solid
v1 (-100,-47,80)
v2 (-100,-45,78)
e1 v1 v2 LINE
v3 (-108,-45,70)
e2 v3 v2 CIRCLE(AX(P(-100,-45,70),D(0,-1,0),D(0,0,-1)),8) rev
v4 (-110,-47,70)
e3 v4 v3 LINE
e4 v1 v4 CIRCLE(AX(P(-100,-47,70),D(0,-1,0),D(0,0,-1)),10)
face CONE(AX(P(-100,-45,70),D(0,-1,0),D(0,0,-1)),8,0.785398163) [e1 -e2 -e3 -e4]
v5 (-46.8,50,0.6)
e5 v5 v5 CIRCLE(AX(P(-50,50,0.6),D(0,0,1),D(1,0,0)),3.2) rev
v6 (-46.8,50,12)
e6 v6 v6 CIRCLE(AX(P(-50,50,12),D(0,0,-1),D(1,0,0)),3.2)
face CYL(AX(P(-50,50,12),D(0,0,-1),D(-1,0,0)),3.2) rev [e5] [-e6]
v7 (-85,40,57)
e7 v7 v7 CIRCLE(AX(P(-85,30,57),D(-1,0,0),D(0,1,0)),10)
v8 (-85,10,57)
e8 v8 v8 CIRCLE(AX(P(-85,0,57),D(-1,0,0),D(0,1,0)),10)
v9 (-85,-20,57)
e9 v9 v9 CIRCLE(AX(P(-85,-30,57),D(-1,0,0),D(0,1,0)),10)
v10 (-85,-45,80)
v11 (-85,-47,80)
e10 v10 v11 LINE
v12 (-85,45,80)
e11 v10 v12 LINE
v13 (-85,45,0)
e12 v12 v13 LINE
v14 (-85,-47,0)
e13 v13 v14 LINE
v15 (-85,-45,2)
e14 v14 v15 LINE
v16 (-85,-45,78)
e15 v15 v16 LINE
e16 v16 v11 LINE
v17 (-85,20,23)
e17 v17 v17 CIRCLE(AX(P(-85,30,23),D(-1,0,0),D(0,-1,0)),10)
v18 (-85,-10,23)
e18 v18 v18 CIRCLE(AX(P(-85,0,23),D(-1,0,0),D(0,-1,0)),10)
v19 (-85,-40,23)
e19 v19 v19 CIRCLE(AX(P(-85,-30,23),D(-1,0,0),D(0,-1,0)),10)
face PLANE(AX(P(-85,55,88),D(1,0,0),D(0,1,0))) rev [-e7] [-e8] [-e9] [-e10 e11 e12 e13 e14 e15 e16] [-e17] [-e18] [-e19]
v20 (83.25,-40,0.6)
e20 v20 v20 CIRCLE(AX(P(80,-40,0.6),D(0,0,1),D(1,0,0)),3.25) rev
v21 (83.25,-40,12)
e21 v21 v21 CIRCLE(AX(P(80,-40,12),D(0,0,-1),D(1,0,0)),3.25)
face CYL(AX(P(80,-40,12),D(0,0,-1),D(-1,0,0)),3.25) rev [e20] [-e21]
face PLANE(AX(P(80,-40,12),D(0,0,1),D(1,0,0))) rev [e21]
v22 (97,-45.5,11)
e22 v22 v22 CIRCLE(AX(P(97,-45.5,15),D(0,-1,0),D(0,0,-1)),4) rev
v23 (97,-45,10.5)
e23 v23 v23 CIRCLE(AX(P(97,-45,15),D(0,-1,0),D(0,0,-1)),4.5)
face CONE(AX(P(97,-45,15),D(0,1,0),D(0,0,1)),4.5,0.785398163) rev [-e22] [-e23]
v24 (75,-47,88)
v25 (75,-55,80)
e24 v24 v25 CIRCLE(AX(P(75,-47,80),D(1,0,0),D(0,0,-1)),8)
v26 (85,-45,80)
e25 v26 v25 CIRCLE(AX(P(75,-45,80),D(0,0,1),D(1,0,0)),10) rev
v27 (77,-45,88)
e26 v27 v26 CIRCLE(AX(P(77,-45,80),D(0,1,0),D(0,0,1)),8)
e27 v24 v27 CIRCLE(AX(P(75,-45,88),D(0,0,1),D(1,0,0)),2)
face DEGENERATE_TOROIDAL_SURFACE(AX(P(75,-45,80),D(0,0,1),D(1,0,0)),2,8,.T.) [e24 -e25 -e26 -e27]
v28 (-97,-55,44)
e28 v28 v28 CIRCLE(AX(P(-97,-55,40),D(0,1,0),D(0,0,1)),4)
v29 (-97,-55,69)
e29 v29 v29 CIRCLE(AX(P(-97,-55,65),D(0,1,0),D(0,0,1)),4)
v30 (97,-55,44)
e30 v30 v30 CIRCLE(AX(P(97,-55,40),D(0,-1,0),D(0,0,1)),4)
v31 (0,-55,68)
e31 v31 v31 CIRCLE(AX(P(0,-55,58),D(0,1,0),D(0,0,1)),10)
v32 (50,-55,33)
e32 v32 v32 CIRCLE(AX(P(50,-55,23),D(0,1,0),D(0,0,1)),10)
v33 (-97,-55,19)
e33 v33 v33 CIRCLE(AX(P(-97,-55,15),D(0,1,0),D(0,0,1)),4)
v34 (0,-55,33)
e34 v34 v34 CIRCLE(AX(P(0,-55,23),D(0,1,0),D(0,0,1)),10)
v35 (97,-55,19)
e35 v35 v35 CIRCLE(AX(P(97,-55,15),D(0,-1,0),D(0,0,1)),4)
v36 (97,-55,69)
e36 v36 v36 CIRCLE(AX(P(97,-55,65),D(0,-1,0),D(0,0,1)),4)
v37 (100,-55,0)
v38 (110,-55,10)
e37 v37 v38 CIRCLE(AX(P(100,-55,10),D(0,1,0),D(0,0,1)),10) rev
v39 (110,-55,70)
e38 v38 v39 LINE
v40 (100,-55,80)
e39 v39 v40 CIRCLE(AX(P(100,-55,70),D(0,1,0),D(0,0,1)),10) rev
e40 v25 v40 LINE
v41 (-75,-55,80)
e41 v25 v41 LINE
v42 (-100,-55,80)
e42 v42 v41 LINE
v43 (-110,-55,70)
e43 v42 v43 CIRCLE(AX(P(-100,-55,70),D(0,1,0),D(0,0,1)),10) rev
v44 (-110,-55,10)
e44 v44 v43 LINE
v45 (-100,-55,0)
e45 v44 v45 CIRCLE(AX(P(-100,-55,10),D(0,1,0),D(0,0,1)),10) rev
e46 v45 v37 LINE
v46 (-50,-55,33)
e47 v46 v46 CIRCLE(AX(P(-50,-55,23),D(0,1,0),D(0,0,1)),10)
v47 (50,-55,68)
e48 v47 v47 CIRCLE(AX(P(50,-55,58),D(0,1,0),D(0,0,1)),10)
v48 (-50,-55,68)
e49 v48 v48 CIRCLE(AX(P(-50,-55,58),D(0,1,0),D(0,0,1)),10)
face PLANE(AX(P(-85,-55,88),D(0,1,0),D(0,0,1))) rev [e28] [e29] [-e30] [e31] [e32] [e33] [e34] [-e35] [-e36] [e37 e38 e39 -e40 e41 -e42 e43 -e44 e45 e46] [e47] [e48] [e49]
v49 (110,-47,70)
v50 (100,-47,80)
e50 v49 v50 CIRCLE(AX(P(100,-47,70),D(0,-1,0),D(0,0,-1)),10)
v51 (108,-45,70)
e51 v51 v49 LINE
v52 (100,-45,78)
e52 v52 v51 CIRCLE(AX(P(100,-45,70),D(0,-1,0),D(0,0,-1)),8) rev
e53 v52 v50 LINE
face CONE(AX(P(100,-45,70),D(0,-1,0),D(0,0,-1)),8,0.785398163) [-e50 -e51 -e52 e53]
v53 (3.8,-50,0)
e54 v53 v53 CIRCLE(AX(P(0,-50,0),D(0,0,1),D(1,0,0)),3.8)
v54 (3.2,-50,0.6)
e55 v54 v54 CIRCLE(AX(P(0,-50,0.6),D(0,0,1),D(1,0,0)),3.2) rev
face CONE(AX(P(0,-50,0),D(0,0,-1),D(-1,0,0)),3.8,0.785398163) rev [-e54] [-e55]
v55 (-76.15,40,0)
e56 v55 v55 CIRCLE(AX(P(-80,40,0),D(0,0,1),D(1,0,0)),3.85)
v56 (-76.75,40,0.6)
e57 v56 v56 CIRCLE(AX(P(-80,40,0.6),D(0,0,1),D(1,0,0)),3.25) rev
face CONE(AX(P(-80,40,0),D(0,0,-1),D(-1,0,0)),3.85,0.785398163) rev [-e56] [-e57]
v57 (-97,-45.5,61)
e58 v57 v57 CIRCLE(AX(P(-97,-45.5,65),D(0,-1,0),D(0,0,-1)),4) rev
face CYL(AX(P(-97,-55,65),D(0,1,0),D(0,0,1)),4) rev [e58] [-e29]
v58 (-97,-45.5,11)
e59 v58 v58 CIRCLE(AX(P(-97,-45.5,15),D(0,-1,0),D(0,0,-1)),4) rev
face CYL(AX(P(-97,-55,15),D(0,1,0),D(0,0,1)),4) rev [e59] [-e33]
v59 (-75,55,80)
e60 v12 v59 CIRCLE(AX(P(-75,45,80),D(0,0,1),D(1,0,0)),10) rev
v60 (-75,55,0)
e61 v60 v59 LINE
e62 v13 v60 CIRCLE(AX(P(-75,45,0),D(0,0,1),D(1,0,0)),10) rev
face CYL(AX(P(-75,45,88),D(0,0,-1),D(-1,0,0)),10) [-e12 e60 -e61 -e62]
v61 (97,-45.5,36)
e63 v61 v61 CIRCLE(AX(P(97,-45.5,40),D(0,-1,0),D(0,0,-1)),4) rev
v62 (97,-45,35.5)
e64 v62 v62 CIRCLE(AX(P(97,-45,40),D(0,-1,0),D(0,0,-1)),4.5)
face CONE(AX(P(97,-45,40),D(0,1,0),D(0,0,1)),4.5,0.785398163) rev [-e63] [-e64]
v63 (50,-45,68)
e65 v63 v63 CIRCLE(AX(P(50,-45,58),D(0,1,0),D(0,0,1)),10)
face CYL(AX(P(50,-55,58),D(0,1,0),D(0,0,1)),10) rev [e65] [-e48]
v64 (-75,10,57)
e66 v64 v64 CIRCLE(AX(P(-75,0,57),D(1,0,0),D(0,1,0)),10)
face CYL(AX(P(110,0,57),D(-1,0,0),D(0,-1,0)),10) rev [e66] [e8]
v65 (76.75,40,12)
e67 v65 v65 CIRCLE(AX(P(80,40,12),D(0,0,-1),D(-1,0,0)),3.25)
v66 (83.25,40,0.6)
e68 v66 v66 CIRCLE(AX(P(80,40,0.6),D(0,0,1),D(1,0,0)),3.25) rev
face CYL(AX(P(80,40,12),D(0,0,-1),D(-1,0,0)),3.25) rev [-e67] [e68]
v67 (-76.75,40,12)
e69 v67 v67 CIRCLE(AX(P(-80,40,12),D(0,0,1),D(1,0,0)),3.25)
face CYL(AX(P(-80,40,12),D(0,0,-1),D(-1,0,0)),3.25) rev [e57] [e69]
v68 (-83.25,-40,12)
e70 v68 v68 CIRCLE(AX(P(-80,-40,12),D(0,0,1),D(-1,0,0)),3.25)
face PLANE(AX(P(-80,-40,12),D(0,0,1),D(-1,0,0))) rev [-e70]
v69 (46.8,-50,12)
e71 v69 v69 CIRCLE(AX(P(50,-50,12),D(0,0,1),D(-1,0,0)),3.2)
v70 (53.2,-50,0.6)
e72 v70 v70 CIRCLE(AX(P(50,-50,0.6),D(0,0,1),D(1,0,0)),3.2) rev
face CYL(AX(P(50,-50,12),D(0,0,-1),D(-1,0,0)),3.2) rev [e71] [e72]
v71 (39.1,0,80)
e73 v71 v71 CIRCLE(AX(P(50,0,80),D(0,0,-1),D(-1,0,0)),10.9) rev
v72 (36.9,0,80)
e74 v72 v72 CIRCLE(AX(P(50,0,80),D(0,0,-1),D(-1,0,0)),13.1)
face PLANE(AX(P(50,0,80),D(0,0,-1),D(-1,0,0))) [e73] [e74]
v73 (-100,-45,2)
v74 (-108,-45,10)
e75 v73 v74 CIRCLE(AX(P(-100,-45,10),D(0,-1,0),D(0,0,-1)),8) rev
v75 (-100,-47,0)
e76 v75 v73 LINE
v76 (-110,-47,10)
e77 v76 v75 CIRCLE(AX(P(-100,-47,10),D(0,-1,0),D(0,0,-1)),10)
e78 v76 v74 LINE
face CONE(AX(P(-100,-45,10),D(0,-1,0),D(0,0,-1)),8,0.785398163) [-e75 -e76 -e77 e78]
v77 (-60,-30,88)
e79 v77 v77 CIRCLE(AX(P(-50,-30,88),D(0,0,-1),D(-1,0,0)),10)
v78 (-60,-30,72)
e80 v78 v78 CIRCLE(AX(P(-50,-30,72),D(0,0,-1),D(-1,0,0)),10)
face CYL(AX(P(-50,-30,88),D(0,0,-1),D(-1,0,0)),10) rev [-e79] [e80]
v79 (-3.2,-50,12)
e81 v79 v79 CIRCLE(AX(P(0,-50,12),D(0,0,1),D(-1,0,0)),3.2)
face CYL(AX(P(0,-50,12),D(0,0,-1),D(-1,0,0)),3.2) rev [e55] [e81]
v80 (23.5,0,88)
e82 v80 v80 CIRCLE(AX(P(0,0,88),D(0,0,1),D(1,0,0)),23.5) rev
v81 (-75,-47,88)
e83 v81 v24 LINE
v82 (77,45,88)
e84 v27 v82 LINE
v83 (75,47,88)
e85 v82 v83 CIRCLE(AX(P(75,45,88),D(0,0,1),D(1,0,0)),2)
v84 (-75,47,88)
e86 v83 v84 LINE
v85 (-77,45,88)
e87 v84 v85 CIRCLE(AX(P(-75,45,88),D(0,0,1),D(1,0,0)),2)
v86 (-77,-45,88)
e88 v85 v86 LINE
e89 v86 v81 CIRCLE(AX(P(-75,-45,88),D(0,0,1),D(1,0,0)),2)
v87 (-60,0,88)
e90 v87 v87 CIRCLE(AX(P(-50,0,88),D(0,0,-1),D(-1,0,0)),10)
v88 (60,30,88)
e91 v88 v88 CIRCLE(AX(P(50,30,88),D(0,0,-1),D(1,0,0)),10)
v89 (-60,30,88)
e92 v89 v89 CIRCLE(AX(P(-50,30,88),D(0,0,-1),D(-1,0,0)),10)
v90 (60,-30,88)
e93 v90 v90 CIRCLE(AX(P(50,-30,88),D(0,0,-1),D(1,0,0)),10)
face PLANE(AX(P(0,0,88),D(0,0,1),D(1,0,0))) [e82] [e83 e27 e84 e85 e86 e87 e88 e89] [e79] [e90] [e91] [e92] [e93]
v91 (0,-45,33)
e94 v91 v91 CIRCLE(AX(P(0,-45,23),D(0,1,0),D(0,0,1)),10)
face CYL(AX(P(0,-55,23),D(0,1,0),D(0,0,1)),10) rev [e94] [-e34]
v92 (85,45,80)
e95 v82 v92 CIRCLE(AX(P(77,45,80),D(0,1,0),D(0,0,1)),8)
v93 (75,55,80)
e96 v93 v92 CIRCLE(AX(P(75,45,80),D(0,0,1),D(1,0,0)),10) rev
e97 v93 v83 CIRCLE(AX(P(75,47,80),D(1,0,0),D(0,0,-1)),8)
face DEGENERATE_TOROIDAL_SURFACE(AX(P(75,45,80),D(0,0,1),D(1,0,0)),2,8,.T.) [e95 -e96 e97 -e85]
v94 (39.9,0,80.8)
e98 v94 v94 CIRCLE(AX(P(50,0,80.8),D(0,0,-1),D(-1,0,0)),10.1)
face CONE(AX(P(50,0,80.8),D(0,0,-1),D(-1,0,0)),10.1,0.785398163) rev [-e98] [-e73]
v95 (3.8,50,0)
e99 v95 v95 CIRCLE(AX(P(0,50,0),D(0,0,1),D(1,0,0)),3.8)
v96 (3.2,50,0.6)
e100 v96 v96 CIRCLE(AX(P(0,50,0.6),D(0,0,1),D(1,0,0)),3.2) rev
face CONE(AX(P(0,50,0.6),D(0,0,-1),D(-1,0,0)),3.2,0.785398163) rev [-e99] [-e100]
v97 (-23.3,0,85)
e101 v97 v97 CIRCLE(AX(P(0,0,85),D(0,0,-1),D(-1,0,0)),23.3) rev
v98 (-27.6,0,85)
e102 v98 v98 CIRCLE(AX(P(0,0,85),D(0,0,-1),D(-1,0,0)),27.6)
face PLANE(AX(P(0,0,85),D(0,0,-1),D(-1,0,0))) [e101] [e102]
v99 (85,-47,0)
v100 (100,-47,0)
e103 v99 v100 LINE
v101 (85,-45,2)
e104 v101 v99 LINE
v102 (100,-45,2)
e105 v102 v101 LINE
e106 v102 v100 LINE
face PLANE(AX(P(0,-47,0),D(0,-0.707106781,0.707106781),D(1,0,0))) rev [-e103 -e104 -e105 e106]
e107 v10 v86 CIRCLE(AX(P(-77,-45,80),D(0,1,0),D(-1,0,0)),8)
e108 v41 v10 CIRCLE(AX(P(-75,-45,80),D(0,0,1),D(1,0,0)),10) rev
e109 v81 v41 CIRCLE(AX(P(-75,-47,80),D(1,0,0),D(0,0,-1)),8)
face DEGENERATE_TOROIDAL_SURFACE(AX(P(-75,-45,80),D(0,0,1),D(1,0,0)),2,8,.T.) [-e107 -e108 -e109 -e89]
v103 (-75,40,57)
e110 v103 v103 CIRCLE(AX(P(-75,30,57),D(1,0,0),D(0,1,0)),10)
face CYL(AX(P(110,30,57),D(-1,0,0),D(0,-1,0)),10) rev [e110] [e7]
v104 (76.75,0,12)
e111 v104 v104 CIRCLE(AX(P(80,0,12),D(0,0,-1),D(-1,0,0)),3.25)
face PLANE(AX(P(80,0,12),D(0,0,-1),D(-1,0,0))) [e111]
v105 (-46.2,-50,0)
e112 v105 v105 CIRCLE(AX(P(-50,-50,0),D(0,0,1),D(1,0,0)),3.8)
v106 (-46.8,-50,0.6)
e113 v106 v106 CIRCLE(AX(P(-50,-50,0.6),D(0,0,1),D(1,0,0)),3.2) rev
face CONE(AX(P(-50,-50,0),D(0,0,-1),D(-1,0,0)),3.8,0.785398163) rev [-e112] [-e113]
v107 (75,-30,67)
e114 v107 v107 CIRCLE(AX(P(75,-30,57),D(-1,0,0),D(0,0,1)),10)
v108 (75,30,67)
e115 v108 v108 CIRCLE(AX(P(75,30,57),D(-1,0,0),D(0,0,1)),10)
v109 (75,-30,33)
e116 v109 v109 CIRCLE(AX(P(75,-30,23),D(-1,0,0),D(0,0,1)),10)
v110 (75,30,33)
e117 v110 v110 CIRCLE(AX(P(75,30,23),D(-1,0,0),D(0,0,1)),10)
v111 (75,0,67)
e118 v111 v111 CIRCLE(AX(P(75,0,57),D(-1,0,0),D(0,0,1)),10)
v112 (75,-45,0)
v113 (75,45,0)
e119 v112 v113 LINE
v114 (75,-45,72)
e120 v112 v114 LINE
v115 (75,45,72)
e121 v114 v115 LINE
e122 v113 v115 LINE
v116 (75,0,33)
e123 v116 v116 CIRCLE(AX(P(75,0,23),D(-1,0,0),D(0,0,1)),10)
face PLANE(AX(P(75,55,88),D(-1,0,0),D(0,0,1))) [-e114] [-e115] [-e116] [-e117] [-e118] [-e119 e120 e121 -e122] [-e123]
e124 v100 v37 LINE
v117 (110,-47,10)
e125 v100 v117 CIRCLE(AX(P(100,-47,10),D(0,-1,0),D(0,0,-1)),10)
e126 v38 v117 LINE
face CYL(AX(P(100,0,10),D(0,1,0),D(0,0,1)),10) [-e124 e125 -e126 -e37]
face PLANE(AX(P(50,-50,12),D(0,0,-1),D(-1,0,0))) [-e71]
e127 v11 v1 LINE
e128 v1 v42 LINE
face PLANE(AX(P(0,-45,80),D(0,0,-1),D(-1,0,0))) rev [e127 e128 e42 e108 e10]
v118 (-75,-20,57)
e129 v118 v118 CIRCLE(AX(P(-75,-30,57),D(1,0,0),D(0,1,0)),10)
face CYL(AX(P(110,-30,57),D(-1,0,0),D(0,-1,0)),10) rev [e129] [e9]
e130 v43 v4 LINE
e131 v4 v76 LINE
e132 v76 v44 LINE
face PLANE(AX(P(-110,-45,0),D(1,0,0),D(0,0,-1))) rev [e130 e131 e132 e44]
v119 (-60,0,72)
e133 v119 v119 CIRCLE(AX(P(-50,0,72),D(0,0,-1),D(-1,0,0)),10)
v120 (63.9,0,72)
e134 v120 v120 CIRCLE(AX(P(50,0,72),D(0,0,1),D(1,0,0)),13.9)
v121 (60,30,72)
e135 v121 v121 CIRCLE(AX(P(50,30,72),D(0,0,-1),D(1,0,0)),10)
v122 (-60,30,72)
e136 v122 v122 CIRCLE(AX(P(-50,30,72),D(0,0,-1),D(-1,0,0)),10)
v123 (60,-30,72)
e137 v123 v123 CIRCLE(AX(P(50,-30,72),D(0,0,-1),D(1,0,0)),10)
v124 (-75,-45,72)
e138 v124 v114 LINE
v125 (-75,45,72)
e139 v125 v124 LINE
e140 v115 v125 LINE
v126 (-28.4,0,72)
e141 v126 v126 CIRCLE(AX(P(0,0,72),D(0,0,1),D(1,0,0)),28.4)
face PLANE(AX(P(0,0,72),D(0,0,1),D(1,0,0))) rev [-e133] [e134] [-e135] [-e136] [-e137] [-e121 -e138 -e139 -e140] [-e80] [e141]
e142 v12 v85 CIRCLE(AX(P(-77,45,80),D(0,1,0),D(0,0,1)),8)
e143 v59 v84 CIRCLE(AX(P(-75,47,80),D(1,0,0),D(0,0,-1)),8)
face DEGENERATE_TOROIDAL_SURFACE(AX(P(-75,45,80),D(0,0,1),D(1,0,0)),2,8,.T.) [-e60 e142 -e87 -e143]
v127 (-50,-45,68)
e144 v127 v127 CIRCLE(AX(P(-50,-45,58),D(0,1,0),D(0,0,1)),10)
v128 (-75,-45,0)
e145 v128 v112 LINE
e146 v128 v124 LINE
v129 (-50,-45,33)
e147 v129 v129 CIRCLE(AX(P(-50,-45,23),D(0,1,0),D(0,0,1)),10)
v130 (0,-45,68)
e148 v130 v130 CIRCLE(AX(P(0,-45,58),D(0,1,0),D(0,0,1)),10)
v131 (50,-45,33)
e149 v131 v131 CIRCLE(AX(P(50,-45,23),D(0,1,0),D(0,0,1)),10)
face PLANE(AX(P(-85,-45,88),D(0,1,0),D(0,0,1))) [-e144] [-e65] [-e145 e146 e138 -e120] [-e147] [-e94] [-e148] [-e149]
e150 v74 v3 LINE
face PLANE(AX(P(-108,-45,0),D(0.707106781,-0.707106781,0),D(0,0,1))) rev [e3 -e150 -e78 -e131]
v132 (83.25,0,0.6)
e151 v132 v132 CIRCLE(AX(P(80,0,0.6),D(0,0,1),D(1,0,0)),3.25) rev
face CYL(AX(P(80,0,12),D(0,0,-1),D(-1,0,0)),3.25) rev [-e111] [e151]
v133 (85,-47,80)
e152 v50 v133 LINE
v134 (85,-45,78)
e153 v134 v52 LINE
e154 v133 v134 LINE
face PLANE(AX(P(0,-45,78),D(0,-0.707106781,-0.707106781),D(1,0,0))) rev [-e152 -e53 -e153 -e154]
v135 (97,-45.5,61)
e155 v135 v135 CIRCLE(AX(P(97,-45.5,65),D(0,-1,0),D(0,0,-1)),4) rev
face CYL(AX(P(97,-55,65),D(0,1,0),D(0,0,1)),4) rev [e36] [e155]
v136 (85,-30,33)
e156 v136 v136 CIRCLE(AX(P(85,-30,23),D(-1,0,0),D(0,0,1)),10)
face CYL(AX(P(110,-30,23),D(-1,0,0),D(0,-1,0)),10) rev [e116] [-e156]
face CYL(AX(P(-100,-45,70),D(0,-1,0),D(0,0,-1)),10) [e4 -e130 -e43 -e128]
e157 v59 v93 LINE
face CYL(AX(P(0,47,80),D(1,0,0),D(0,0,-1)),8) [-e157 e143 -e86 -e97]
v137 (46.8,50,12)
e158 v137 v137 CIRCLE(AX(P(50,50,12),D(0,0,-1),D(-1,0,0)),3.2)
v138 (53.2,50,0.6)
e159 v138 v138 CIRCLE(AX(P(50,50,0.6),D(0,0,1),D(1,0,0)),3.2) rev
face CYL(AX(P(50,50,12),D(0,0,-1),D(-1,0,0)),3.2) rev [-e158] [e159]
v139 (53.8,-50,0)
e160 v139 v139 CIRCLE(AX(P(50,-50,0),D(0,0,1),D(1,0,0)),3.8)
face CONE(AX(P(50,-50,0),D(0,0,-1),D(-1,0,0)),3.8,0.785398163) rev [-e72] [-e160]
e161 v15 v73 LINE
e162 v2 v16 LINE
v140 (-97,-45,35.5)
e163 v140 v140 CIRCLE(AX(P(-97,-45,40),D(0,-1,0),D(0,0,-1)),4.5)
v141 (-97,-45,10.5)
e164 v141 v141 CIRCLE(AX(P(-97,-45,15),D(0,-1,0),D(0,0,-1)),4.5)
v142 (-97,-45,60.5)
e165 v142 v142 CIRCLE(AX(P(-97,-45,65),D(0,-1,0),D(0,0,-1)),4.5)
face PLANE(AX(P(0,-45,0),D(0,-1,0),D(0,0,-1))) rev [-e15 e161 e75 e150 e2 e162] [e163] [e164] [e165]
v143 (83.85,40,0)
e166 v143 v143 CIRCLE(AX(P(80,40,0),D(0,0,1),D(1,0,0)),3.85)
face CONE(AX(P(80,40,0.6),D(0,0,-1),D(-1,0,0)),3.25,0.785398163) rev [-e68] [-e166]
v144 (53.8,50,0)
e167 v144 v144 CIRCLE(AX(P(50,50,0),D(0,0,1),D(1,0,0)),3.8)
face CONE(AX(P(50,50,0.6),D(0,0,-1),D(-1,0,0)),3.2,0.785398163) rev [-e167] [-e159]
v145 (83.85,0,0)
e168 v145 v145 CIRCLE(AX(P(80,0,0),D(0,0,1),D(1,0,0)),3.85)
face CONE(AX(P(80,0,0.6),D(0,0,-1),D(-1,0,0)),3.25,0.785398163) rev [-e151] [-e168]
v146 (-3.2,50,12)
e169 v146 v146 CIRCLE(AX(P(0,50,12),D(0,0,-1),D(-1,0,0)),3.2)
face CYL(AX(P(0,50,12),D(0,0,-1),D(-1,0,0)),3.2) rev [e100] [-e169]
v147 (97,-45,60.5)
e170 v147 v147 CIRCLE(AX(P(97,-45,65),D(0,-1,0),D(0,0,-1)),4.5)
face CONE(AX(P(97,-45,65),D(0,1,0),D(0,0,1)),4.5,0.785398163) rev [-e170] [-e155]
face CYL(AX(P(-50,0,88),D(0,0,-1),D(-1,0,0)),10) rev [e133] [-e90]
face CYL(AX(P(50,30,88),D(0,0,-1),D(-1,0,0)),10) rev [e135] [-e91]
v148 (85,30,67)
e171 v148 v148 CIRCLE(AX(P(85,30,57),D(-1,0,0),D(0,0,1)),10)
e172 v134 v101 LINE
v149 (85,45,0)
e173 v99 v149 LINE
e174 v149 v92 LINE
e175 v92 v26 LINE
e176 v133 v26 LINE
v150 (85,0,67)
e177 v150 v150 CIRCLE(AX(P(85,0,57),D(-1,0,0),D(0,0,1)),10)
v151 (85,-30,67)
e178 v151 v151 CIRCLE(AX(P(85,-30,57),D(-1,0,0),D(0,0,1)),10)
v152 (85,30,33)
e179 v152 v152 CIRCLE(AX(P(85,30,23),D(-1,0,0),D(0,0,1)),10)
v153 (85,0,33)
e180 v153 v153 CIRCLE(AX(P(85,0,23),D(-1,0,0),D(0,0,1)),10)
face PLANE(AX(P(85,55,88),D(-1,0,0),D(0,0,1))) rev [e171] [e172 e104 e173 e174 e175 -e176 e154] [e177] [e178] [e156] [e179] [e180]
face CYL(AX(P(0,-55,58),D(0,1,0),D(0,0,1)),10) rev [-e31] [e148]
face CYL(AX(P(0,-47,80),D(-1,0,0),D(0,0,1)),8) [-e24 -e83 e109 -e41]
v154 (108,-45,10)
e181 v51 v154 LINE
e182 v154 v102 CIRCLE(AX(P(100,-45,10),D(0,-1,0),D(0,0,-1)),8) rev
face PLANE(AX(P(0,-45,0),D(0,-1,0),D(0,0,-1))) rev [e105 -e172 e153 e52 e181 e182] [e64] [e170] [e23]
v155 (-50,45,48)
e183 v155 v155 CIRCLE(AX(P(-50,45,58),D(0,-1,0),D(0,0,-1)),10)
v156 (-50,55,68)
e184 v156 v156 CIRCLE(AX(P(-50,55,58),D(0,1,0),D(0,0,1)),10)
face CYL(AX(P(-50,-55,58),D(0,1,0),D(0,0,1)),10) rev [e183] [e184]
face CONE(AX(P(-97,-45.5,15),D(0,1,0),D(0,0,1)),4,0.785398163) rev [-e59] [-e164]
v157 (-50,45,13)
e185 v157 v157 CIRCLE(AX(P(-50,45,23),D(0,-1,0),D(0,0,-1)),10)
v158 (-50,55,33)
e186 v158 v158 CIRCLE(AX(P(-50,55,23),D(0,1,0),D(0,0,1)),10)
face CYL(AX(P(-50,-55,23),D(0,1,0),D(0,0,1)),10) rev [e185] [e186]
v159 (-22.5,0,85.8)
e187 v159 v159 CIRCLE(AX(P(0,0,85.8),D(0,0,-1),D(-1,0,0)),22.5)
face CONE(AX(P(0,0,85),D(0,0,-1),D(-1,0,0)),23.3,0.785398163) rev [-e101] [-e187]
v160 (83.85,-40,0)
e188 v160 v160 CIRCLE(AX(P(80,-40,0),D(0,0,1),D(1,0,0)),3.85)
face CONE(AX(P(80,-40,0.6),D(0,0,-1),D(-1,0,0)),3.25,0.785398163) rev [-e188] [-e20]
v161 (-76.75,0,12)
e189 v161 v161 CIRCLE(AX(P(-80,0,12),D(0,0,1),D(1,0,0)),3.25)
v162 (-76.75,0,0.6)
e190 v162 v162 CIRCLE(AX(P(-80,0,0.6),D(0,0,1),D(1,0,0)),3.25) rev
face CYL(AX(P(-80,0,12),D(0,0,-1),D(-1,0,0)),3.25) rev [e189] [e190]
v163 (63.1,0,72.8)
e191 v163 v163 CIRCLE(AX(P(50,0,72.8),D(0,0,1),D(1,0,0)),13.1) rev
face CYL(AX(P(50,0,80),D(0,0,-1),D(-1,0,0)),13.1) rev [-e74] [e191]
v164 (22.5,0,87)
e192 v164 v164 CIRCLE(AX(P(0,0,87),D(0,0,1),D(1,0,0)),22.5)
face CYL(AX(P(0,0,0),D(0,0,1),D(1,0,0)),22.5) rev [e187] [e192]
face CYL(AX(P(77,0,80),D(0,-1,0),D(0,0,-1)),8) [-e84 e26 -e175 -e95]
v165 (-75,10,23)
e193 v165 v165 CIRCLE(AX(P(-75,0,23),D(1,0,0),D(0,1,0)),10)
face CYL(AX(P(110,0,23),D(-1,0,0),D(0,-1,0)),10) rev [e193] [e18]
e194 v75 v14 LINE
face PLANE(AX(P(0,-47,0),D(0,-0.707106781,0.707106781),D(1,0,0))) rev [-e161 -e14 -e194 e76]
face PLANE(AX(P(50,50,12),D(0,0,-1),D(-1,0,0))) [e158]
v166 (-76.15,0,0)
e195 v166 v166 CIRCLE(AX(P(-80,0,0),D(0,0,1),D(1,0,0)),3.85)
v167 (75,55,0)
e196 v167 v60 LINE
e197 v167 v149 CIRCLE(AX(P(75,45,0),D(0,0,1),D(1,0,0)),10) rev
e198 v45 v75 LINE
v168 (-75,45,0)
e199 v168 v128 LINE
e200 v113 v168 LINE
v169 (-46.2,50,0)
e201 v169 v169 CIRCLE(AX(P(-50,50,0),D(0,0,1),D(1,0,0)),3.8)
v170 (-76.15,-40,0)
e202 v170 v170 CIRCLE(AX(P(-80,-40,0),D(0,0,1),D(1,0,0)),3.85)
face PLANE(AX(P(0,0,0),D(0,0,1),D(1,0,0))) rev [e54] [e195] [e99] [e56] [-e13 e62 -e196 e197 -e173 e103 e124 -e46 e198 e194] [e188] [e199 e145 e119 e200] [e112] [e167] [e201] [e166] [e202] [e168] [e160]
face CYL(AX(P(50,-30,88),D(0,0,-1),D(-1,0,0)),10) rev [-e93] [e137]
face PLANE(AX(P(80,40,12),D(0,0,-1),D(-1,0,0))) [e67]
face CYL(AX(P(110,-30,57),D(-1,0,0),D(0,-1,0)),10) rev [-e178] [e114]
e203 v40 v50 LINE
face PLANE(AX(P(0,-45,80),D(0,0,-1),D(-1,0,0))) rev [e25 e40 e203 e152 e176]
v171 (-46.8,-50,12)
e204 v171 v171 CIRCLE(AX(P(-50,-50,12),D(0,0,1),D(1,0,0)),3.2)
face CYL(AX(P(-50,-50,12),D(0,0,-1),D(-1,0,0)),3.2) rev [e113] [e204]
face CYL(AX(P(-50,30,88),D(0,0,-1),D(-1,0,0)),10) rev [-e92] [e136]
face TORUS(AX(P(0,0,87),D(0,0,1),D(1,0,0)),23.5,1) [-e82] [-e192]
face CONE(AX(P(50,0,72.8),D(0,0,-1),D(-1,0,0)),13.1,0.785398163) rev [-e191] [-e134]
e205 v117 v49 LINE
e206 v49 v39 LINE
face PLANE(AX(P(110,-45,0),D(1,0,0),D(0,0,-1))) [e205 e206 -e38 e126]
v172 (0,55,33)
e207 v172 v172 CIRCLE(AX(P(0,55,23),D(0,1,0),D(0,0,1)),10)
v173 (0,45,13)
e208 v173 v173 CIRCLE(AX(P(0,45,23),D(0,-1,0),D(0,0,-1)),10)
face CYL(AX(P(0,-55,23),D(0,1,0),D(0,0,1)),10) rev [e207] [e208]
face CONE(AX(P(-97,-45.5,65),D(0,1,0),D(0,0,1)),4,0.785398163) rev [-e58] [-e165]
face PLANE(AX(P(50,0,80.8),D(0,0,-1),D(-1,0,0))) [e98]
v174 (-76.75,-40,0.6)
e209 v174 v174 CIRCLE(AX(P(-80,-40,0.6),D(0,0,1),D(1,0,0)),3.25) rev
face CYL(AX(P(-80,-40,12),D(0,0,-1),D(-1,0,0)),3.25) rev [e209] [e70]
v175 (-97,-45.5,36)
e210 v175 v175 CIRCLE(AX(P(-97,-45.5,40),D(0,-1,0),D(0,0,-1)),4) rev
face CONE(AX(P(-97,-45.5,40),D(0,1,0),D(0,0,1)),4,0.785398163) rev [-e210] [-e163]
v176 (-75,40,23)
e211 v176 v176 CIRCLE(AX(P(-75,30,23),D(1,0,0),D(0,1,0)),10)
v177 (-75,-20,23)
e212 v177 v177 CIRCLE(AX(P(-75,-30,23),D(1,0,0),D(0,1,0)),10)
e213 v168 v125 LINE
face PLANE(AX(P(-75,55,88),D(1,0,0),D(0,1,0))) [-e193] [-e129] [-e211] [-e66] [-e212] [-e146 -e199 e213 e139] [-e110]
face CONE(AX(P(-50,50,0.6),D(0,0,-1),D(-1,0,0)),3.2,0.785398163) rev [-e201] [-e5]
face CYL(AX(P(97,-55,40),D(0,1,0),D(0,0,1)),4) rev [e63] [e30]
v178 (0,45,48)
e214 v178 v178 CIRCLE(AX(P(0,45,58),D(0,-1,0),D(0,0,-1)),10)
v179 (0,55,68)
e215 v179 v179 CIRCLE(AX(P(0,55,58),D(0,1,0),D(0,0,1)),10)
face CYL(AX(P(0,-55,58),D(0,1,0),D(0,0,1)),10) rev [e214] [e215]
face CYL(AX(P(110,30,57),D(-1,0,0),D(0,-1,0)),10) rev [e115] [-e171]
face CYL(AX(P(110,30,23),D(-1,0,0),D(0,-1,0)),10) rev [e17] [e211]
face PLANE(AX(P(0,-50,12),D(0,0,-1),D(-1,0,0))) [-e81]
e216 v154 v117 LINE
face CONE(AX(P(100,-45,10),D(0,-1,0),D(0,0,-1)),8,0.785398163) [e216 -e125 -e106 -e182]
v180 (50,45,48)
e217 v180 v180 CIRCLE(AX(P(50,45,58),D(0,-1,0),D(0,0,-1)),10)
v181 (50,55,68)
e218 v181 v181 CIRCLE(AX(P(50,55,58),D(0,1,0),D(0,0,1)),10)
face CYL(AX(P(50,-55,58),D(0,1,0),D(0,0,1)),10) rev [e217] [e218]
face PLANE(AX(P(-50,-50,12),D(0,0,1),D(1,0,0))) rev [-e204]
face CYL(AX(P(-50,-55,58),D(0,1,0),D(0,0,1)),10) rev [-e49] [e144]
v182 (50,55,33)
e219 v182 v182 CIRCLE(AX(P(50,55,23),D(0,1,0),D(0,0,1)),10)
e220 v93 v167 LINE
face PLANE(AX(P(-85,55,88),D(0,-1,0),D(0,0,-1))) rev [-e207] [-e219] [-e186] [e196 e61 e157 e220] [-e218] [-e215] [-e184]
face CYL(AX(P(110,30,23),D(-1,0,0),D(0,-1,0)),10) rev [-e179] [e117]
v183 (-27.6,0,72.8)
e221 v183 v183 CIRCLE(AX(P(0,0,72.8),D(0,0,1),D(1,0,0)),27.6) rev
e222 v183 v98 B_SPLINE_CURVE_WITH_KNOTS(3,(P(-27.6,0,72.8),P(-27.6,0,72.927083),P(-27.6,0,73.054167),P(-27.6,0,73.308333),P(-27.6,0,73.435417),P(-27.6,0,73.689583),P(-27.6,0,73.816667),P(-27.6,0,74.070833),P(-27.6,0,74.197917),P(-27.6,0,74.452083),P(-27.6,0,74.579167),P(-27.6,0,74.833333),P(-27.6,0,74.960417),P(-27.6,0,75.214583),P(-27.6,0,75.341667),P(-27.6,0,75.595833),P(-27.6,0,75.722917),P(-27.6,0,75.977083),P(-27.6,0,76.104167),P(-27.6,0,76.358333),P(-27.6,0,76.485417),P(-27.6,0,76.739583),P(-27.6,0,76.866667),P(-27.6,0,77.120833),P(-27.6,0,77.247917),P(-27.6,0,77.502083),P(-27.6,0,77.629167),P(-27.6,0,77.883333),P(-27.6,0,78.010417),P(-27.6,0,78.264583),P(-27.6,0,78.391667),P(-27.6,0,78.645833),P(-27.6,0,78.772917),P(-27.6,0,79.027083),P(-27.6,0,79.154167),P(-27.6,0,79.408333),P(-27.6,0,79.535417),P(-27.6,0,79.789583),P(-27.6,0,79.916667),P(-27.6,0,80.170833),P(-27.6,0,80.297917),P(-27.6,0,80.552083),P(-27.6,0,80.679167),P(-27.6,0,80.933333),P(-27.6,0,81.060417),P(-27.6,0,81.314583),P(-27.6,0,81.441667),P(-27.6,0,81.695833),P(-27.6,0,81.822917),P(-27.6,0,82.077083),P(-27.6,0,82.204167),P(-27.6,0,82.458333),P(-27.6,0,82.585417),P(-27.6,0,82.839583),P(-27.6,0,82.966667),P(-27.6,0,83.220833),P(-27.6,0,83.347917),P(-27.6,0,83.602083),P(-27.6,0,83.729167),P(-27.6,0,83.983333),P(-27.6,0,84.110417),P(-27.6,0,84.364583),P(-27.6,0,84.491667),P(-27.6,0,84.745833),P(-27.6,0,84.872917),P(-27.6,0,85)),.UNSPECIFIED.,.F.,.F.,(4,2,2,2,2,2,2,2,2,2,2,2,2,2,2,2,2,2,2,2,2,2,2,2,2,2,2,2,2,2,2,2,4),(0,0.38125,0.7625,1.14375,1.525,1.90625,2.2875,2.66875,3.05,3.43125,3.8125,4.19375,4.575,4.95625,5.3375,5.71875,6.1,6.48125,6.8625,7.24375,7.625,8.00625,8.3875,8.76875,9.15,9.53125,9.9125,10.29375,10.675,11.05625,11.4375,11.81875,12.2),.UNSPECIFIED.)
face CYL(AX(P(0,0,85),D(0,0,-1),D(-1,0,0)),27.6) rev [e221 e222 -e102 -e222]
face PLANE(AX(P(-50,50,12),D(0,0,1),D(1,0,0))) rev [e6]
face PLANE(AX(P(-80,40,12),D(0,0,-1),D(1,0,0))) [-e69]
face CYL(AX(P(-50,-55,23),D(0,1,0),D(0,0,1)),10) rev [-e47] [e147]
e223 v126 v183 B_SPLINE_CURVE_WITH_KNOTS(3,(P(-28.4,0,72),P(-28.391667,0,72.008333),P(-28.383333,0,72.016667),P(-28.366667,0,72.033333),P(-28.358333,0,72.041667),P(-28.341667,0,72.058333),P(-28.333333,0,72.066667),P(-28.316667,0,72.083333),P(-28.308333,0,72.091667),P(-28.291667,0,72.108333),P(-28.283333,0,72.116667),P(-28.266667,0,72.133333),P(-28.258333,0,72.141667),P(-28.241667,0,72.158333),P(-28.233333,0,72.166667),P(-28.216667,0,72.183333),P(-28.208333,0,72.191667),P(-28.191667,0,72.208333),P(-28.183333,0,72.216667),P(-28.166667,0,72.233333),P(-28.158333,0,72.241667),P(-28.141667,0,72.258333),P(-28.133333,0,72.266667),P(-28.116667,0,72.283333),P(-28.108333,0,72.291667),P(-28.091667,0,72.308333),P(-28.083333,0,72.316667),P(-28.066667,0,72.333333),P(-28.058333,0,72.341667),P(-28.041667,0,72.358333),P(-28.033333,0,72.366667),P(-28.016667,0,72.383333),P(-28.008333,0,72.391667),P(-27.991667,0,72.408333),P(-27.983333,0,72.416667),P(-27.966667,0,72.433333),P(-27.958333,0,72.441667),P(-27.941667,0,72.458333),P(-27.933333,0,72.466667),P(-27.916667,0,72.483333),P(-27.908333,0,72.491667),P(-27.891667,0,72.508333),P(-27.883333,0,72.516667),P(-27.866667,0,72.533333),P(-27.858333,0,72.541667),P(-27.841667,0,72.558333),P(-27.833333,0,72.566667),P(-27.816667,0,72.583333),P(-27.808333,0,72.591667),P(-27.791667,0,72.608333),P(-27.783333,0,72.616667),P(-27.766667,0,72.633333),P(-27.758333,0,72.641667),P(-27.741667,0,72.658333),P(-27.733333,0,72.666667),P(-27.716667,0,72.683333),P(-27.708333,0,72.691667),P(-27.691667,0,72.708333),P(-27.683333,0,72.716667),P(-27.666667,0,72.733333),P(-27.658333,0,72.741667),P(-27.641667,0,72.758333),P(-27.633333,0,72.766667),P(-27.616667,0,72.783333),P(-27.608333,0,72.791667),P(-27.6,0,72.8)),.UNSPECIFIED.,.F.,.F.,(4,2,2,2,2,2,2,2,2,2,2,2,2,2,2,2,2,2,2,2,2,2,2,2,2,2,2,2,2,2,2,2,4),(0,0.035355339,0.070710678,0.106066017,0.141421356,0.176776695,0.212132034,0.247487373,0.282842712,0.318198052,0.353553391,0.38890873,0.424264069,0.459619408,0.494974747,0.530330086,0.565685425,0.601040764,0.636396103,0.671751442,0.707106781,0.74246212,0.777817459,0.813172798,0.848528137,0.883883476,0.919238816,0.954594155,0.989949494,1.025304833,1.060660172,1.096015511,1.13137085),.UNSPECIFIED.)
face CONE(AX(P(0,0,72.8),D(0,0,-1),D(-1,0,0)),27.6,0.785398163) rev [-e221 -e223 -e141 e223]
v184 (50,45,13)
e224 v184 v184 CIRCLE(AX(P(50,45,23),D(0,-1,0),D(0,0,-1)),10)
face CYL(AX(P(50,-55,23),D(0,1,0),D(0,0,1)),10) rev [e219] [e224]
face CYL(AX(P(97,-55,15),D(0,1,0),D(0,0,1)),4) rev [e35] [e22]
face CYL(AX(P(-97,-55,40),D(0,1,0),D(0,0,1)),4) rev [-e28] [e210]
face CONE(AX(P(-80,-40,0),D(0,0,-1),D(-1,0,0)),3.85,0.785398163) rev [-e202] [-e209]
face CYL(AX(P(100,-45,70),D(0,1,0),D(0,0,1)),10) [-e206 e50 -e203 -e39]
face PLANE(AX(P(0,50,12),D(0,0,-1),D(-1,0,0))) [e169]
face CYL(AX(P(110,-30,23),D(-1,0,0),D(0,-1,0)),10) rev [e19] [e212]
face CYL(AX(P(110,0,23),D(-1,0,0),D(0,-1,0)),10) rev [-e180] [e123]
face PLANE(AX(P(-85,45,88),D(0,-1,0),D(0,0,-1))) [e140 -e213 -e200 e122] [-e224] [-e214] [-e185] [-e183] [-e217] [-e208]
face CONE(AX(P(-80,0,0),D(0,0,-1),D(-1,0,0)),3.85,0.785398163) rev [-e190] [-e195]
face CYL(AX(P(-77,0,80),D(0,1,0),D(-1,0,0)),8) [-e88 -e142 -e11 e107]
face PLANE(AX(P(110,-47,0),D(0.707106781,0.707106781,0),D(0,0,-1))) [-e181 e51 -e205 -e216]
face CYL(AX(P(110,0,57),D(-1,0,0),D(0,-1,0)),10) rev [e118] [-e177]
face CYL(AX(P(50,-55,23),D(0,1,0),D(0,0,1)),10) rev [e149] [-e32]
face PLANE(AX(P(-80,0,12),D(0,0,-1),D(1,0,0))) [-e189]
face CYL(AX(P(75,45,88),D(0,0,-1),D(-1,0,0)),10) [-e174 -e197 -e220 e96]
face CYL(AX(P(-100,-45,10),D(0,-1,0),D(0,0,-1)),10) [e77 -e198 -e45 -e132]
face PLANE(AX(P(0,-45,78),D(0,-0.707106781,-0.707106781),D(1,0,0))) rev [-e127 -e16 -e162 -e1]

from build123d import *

# Parameters (mm, degrees)
SKETCH1_W           = 170
SKETCH1_H           = 110
BOSS_EXTRUDE1_DEPTH = 88
FILLET1_R           = 10
SHELL1_START        = -75
SHELL1_OUTLINE_W    = 90
SHELL1_OUTLINE_H    = 72
SHELL1_DEPTH        = 150
SKETCH2_R           = 22.5
CUT_EXTRUDE1_DEPTH  = 135.141716107
SKETCH3_R           = 27.6
CUT_EXTRUDE2_DEPTH  = 13
FILLET2_R           = 8
SKETCH5_R           = 13.1
CUT_EXTRUDE3_DEPTH  = 8
SKETCH6_R           = 10.1
CUT_EXTRUDE4_DEPTH  = 0.8
CHAMFER1_SIZE       = 0.8
FILLET3_R           = 1
SKETCH7_W           = 35
SKETCH7_H           = 80
BOSS_EXTRUDE2_DEPTH = 10
FILLET5_R           = 10
CHAMFER2_SIZE       = 2
SKETCH8_R           = 4
CUT_EXTRUDE5_DEPTH  = 173.754160587
CHAMFER3_SIZE       = 0.5
SKETCH9_R           = 3.2
CUT_EXTRUDE6_DEPTH  = 12
SKETCH10_R          = 3.25
CUT_EXTRUDE7_DEPTH  = 12
CHAMFER4_SIZE       = 0.6
SKETCH11_R          = 10
CUT_EXTRUDE8_DEPTH  = 143.509648796
SKETCH12_R          = 10
CUT_EXTRUDE9_DEPTH  = 221.893639564
SKETCH13_R          = 10
CUT_EXTRUDE12_DEPTH = 179.728844902


# Read off the part's stored shape, not the designer's step: Shell1
# Some blends are built 0.0001 mm under size
with BuildPart() as part:
    # Sketch1 → Boss-Extrude1 (new body)
    with BuildSketch(Plane.XY):
        Rectangle(SKETCH1_W, SKETCH1_H)
    extrude(amount=BOSS_EXTRUDE1_DEPTH)

    # Fillet1
    fillet1_edges = [part.edges().sort_by_distance(p)[0] for p in [
        (85, -55, 44),
        (-85, -55, 44),
        (-85, 55, 44),
        (85, 55, 44),
    ]]
    fillet(fillet1_edges, radius=FILLET1_R)

    # Shell1 outline → Shell1 (cut)
    with BuildSketch(Plane.YZ.offset(SHELL1_START)):
        with Locations((0, 36)):
            Rectangle(SHELL1_OUTLINE_W, SHELL1_OUTLINE_H)
    extrude(amount=SHELL1_DEPTH, mode=Mode.SUBTRACT)

    # Sketch2 → Cut-Extrude1 (cut, through all)
    with BuildSketch(Plane.XY.offset(88)):
        Circle(SKETCH2_R)
    extrude(amount=-CUT_EXTRUDE1_DEPTH, mode=Mode.SUBTRACT)

    # Sketch3 → Cut-Extrude2 (cut)
    with BuildSketch(Plane(origin=(0, 0, 72), x_dir=(-1, 0, 0), z_dir=(0, 0, -1))):
        Circle(SKETCH3_R)
    extrude(amount=-CUT_EXTRUDE2_DEPTH, mode=Mode.SUBTRACT)

    # Fillet2
    fillet2_edges = [part.edges().sort_by_distance(p)[0] for p in [
        (0, -55, 88),
        (-85, 0, 88),
        (85, 0, 88),
        (0, 55, 88),
        (-82.071067812, 52.071067812, 88),
        (82.071067812, 52.071067812, 88),
        (82.071067812, -52.071067812, 88),
        (-82.071067812, -52.071067812, 88),
    ]]
    fillet(fillet2_edges, radius=FILLET2_R)

    # Sketch5 → Cut-Extrude3 (cut)
    with BuildSketch(Plane(origin=(0, 0, 72), x_dir=(-1, 0, 0), z_dir=(0, 0, -1))):
        with Locations((-50, 0)):
            Circle(SKETCH5_R)
    extrude(amount=-CUT_EXTRUDE3_DEPTH, mode=Mode.SUBTRACT)

    # Sketch6 → Cut-Extrude4 (cut)
    with BuildSketch(Plane(origin=(0, 0, 80), x_dir=(-1, 0, 0), z_dir=(0, 0, -1))):
        with Locations((-50, 0)):
            Circle(SKETCH6_R)
    extrude(amount=-CUT_EXTRUDE4_DEPTH, mode=Mode.SUBTRACT)

    # Chamfer1
    chamfer1_edges = [part.edges().sort_by_distance(p)[0] for p in [
        (27.6, 0, 72),
        (-22.5, 0, 85),
        (63.1, 0, 72),
        (60.1, 0, 80),
    ]]
    chamfer(chamfer1_edges, length=CHAMFER1_SIZE - 0.0001)  # a hair under: the kernel refuses the full size

    # Fillet3
    fillet3_edges = [part.edges().sort_by_distance(p)[0] for p in [
        (-22.5, 0, 88),
    ]]
    fillet(fillet3_edges, radius=FILLET3_R)

    # Sketch7 → Boss-Extrude2 (add)
    with BuildSketch(Plane.XZ.offset(55)):
        with Locations((-92.5, 40)):
            Rectangle(SKETCH7_W, SKETCH7_H)
        with Locations((92.5, 40)):
            Rectangle(SKETCH7_W, SKETCH7_H)
    extrude(amount=-BOSS_EXTRUDE2_DEPTH)

    # Fillet5
    fillet5_edges = [part.edges().sort_by_distance(p)[0] for p in [
        (-110, -50, 80),
        (-110, -50, 0),
        (110, -50, 0),
        (110, -50, 80),
    ]]
    fillet(fillet5_edges, radius=FILLET5_R)

    # Chamfer2
    # the kernel refuses this chamfer: 2 mm, written as the material it takes off along each edge
    with BuildSketch(Plane(origin=(85, -45, 0), x_dir=(0, -0.9996219169112968, -0.02749587661058639), z_dir=(1, 0, 0)), Plane(origin=(-100, -45, 0), x_dir=(0, -0.9996219169112968, -0.02749587661058639), z_dir=(1, 0, 0))) as chamfer2_piece_1:
        Polygon((CHAMFER2_SIZE * 0.999621916911, -CHAMFER2_SIZE * 0.0274958766106), (-CHAMFER2_SIZE * 0.0274958766106, -CHAMFER2_SIZE * 0.999621916911), (0, 0), align=None)
    extrude(amount=15, mode=Mode.SUBTRACT)
    with BuildSketch(Plane(origin=(100, -45, 80), x_dir=(0, 0.02749587661058555, -0.9996219169112968), z_dir=(-1, 0, 0)), Plane(origin=(-85, -45, 80), x_dir=(0, 0.02749587661058555, -0.9996219169112968), z_dir=(-1, 0, 0))) as chamfer2_piece_2:
        Polygon((CHAMFER2_SIZE * 0.999621916911, CHAMFER2_SIZE * 0.0274958766106), (-CHAMFER2_SIZE * 0.0274958766106, CHAMFER2_SIZE * 0.999621916911), (0, 0), align=None)
    extrude(amount=15, mode=Mode.SUBTRACT)
    with BuildSketch(Plane(origin=(110, -45, 10), x_dir=(-0.9996219169112968, 0.02749587661058555, 0), z_dir=(0, 0, 1)), Plane(origin=(-110, -45, 70), x_dir=(0.9996219169112968, 0.02749587661058555, 0), z_dir=(0, 0, -1))) as chamfer2_piece_3:
        Polygon((CHAMFER2_SIZE * 0.999621916911, CHAMFER2_SIZE * 0.0274958766106), (-CHAMFER2_SIZE * 0.0274958766106, CHAMFER2_SIZE * 0.999621916911), (0, 0), align=None)
    extrude(amount=60, mode=Mode.SUBTRACT)
    with BuildSketch(Plane(origin=(100, -45, 70), x_dir=(1, 0, 0), z_dir=(0, 0, -1))) as chamfer2_piece_4:
        Polygon((10 - CHAMFER2_SIZE, 0), (10, CHAMFER2_SIZE), (10, 0), align=None)
    revolve(axis=Axis((100, -45, 70), (0, -1, 0)), revolution_arc=90, mode=Mode.SUBTRACT)
    with BuildSketch(Plane(origin=(100, -45, 10), x_dir=(0, 0, -1), z_dir=(-1, 0, 0))) as chamfer2_piece_5:
        Polygon((10, CHAMFER2_SIZE), (10 - CHAMFER2_SIZE, 0), (10, 0), align=None)
    revolve(axis=Axis((100, -45, 10), (0, -1, 0)), revolution_arc=90, mode=Mode.SUBTRACT)
    with BuildSketch(Plane(origin=(-100, -45, 70), x_dir=(0, 0, 1), z_dir=(1, 0, 0))) as chamfer2_piece_6:
        Polygon((10 - CHAMFER2_SIZE, 0), (10, CHAMFER2_SIZE), (10, 0), align=None)
    revolve(axis=Axis((-100, -45, 70), (0, -1, 0)), revolution_arc=90, mode=Mode.SUBTRACT)
    with BuildSketch(Plane(origin=(-100, -45, 10), x_dir=(0, 0, -1), z_dir=(1, 0, 0))) as chamfer2_piece_7:
        Polygon((10, -CHAMFER2_SIZE), (10 - CHAMFER2_SIZE, 0), (10, 0), align=None)
    revolve(axis=Axis((-100, -45, 10), (0, 1, 0)), revolution_arc=90, mode=Mode.SUBTRACT)

    # Sketch8 → Cut-Extrude5 (cut, through all)
    with BuildSketch(Plane(origin=(0, -45, 0), x_dir=(1, 0, 0), z_dir=(0, 1, 0))):
        with Locations(Location((-97, -40, 0), (0, 0, 270))):
            Circle(SKETCH8_R)
        with Locations(Location((-97, -15, 0), (0, 0, 270))):
            Circle(SKETCH8_R)
        with Locations(Location((-97, -65, 0), (0, 0, 270))):
            Circle(SKETCH8_R)
    cut_extrude5 = extrude(amount=-CUT_EXTRUDE5_DEPTH, mode=Mode.SUBTRACT)

    # Mirror4: Cut-Extrude5 across plane
    add(cut_extrude5.mirror(Plane(origin=(0, 0, 0), x_dir=(0, 0, 1), z_dir=(1, 0, 0))), mode=Mode.SUBTRACT)

    # Chamfer3
    chamfer3_edges = [part.edges().sort_by_distance(p)[0] for p in [
        (-97, -45, 61),
        (-97, -45, 11),
        (-97, -45, 36),
        (97, -45, 61),
        (97, -45, 11),
        (97, -45, 36),
    ]]
    chamfer(chamfer3_edges, length=CHAMFER3_SIZE)

    # Sketch9 → Cut-Extrude6 (cut)
    with BuildSketch(Plane(origin=(0, 0, 0), x_dir=(-1, 0, 0), z_dir=(0, 0, -1))):
        with Locations((0, 50)):
            Circle(SKETCH9_R)
        with Locations((-50, 50)):
            Circle(SKETCH9_R)
        with Locations(Location((50, 50, 0), (0, 0, 180))):
            Circle(SKETCH9_R)
    cut_extrude6 = extrude(amount=-CUT_EXTRUDE6_DEPTH, mode=Mode.SUBTRACT)

    # Mirror5: Cut-Extrude6 across plane
    add(cut_extrude6.mirror(Plane.ZX), mode=Mode.SUBTRACT)

    # Sketch10 → Cut-Extrude7 (cut)
    with BuildSketch(Plane(origin=(0, 0, 0), x_dir=(-1, 0, 0), z_dir=(0, 0, -1))):
        with Locations((-80, 0)):
            Circle(SKETCH10_R)
        with Locations((-80, 40)):
            Circle(SKETCH10_R)
        with Locations(Location((-80, -40, 0), (0, 0, 180))):
            Circle(SKETCH10_R)
    cut_extrude7 = extrude(amount=-CUT_EXTRUDE7_DEPTH, mode=Mode.SUBTRACT)

    # Mirror6: Cut-Extrude7 across plane
    add(cut_extrude7.mirror(Plane(origin=(0, 0, 0), x_dir=(0, 0, 1), z_dir=(1, 0, 0))), mode=Mode.SUBTRACT)

    # Chamfer4
    chamfer4_edges = [part.edges().sort_by_distance(p)[0] for p in [
        (-53.2, 50, 0),
        (53.2, 50, 0),
        (3.2, 50, 0),
        (-53.2, -50, 0),
        (53.2, -50, 0),
        (3.2, -50, 0),
        (76.75, -40, 0),
        (83.25, 40, 0),
        (83.25, 0, 0),
        (-76.75, -40, 0),
        (-83.25, 40, 0),
        (-83.25, 0, 0),
    ]]
    chamfer(chamfer4_edges, length=CHAMFER4_SIZE)

    # Sketch11 → Cut-Extrude8 (cut, through all)
    with BuildSketch(Plane(origin=(0, 0, 72), x_dir=(-1, 0, 0), z_dir=(0, 0, -1))):
        Circle(SKETCH11_R)
        with Locations((50, 0)):
            Circle(SKETCH11_R)
        with Locations((50, 30)):
            Circle(SKETCH11_R)
        with Locations((50, -30)):
            Circle(SKETCH11_R)
        with Locations(Location((-50, -30, 0), (0, 0, 180))):
            Circle(SKETCH11_R)
        with Locations(Location((-50, 30, 0), (0, 0, 180))):
            Circle(SKETCH11_R)
    extrude(amount=-CUT_EXTRUDE8_DEPTH, mode=Mode.SUBTRACT)

    # Sketch12 → Cut-Extrude9 (cut, through all)
    with BuildSketch(Plane.ZY.offset(85)):
        with Locations(Location((23, 0, 0), (0, 0, 270))):
            Circle(SKETCH12_R)
        with Locations(Location((23, 30, 0), (0, 0, 270))):
            Circle(SKETCH12_R)
        with Locations(Location((23, -30, 0), (0, 0, 270))):
            Circle(SKETCH12_R)
        with Locations(Location((57, -30, 0), (0, 0, 90))):
            Circle(SKETCH12_R)
        with Locations(Location((57, 0, 0), (0, 0, 90))):
            Circle(SKETCH12_R)
        with Locations(Location((57, 30, 0), (0, 0, 90))):
            Circle(SKETCH12_R)
    extrude(amount=-CUT_EXTRUDE9_DEPTH, mode=Mode.SUBTRACT)

    # Sketch13 → Cut-Extrude12 (cut, through all)
    with BuildSketch(Plane(origin=(0, 55, 0), x_dir=(1, 0, 0), z_dir=(0, 1, 0))):
        with Locations(Location((-50, -23, 0), (0, 0, 270))):
            Circle(SKETCH13_R)
        with Locations(Location((-50, -58, 0), (0, 0, 270))):
            Circle(SKETCH13_R)
        with Locations(Location((0, -23, 0), (0, 0, 270))):
            Circle(SKETCH13_R)
        with Locations(Location((0, -58, 0), (0, 0, 270))):
            Circle(SKETCH13_R)
        with Locations(Location((50, -23, 0), (0, 0, 270))):
            Circle(SKETCH13_R)
        with Locations(Location((50, -58, 0), (0, 0, 270))):
            Circle(SKETCH13_R)
    extrude(amount=-CUT_EXTRUDE12_DEPTH, mode=Mode.SUBTRACT)


solid = part.part
